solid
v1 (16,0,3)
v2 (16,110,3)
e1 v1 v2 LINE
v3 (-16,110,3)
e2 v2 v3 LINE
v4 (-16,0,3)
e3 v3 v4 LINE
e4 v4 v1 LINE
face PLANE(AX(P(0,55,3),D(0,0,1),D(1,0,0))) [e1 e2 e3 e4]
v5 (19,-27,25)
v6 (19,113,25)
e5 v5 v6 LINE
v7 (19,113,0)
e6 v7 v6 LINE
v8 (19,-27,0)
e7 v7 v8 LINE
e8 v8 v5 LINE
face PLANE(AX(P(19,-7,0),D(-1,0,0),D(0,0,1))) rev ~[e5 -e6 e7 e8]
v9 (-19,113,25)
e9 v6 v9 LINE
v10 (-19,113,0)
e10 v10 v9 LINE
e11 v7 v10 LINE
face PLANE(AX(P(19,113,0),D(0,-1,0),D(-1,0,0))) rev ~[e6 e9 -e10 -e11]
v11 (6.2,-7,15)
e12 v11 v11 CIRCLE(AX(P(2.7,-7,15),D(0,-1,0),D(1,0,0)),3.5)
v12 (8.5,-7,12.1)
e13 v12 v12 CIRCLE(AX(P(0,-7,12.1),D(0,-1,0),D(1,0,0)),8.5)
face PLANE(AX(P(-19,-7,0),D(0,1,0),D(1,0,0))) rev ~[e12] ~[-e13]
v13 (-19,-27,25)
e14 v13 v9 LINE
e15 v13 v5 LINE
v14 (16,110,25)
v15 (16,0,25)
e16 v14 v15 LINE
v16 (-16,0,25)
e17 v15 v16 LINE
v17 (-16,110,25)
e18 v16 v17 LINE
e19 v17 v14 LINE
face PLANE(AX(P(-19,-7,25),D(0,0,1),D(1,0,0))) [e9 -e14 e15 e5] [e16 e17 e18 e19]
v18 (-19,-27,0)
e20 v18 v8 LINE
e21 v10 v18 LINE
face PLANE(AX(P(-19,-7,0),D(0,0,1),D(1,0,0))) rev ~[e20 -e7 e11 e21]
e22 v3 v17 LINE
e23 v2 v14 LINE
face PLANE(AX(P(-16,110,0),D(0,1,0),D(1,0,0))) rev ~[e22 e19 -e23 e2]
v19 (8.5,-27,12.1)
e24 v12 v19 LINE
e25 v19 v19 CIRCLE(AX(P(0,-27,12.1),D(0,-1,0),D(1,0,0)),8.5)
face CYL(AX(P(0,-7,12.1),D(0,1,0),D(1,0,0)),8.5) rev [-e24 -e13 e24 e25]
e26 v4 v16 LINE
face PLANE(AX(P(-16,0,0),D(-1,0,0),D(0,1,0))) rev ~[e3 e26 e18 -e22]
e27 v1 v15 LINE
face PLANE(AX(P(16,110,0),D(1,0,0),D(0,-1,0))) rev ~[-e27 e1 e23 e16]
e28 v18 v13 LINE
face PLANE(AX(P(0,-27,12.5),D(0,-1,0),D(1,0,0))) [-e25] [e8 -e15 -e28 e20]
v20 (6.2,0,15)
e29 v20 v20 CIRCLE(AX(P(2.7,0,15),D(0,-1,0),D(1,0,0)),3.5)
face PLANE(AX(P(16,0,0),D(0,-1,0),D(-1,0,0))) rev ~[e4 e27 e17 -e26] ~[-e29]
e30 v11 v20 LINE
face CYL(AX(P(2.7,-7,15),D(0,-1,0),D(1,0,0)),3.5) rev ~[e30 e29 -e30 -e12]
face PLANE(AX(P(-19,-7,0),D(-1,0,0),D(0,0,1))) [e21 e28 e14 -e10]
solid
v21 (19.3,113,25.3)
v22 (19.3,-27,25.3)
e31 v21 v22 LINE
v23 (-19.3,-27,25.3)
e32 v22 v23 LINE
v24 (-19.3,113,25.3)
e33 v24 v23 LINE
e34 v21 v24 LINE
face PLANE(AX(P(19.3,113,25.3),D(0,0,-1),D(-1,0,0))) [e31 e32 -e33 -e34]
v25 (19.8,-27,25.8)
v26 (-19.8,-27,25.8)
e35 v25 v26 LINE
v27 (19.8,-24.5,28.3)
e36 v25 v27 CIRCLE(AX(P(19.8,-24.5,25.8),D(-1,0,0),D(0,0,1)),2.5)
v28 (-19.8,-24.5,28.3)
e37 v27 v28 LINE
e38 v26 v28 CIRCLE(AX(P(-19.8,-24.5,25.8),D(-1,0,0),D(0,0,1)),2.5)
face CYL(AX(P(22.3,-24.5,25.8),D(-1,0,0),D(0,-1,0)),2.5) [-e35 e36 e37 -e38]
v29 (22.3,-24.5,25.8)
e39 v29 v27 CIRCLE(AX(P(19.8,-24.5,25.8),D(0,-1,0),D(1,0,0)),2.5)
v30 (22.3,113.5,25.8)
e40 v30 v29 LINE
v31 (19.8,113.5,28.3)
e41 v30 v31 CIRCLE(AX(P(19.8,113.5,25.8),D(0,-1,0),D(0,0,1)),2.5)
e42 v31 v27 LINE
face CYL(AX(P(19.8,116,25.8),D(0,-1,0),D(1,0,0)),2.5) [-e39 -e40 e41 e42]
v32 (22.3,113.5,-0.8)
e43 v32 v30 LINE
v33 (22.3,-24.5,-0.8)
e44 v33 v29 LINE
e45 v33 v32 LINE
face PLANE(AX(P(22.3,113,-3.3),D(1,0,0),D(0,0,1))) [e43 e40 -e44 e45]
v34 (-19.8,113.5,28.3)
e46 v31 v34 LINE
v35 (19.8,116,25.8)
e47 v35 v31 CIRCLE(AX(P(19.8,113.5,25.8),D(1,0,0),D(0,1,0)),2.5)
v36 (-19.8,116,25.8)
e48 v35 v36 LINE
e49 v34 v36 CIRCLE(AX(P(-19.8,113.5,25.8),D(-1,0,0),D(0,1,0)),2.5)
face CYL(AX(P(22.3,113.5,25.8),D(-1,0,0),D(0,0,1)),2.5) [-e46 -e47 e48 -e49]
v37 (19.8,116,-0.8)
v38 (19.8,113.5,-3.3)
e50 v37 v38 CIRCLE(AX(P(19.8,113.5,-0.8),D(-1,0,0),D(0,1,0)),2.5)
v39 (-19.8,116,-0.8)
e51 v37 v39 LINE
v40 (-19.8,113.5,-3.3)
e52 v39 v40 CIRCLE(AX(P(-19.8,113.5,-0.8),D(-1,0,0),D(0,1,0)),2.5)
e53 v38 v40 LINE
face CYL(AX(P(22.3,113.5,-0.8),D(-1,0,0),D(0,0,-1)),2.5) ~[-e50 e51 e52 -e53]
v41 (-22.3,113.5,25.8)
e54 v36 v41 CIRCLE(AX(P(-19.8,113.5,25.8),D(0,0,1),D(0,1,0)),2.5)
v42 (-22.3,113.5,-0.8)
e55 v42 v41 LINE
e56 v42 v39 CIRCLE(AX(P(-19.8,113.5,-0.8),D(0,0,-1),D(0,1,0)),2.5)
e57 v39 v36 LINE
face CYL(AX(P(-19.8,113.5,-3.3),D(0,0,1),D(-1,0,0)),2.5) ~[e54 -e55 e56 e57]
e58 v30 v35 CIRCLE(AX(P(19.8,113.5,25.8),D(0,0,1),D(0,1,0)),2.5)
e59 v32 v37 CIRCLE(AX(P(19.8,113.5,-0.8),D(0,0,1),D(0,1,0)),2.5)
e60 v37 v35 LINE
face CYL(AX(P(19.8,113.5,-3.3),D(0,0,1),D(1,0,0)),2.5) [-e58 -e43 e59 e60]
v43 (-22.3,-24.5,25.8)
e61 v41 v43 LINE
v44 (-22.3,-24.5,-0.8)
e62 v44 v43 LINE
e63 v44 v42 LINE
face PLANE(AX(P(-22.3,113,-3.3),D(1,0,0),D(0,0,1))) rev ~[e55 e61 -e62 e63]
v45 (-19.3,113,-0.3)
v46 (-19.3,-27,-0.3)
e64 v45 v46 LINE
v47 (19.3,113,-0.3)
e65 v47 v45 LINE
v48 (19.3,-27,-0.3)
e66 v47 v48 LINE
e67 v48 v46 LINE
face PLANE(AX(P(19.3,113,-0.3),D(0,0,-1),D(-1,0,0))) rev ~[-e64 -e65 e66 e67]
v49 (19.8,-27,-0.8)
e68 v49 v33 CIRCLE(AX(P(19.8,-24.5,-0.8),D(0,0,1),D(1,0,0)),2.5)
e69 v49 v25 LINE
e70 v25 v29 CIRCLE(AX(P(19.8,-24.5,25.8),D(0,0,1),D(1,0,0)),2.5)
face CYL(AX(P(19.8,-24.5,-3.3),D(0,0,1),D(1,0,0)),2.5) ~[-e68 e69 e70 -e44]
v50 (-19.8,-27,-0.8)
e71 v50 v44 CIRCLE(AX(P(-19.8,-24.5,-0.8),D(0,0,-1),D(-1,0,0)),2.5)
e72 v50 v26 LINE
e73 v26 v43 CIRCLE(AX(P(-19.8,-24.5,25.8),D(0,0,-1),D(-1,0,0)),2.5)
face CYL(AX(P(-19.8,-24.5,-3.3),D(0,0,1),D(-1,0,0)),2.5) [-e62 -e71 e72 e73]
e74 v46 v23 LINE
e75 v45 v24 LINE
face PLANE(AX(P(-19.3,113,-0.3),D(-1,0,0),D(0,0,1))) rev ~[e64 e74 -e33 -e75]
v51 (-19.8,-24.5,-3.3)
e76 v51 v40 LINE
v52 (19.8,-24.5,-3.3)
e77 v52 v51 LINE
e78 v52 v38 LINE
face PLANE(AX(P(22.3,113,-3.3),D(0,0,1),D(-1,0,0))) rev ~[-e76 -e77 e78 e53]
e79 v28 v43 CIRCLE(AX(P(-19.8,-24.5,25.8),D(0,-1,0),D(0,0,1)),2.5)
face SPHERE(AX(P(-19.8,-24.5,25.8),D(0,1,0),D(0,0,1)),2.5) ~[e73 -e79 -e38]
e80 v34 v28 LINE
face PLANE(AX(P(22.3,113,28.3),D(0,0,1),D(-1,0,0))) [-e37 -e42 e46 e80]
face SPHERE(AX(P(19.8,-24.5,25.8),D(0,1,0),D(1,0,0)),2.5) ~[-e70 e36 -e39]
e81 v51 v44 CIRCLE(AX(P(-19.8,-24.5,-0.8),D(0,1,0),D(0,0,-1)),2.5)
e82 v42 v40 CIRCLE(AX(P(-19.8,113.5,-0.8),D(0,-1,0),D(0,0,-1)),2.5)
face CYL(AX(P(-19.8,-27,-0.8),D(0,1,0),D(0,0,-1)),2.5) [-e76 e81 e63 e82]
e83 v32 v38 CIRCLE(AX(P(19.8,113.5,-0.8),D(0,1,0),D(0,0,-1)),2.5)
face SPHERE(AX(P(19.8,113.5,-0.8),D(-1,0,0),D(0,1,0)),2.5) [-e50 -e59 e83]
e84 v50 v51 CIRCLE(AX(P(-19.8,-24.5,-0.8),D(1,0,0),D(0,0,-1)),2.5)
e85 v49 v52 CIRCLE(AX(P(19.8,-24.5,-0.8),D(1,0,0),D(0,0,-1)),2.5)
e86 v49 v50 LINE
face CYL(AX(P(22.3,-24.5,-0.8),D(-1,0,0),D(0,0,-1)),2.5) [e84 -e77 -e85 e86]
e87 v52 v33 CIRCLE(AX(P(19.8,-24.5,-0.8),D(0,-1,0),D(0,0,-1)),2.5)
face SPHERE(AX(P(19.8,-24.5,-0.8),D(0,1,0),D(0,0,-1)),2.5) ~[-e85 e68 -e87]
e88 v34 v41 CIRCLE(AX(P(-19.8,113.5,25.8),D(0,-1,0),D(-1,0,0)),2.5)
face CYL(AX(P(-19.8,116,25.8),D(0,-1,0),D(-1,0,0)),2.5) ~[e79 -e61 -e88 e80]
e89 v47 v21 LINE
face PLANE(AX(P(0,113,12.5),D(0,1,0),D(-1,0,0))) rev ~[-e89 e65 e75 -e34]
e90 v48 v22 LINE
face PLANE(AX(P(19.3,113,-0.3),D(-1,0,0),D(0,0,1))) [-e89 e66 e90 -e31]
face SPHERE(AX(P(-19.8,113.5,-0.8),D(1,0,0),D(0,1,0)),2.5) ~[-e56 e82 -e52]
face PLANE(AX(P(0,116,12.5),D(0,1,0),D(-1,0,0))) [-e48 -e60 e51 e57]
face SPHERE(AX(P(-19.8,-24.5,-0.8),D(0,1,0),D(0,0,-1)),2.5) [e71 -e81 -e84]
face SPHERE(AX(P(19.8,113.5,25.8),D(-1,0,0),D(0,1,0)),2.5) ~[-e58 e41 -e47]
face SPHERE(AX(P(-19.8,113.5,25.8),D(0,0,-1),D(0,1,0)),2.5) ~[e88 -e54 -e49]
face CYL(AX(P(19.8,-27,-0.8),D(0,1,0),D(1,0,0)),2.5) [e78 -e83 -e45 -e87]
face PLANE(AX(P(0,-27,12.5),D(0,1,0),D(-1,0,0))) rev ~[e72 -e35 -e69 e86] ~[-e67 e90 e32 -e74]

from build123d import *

# Parameters (mm, degrees)
F1_DEPTH = 3
F2_DEPTH = 25
F3_W     = 44.5999994099
F3_H     = 31.5999994099
F3_W_2   = 38.6
F3_H_2   = 25.6
F4_DEPTH = 140
F3_W_3   = 38
F3_H_3   = 25
F5_DEPTH = 3
F6_W     = 38
F6_H     = 25
F6_R     = 8.5
F7_DEPTH = 20
F6_R_2   = 3.5
F8_DEPTH = 7
F9_R     = 2.5


with BuildPart() as f1:
    # F0 (on Top) → F1 (new body)
    with BuildSketch(Plane.XY):
        Polygon((16, 110), (0, 110), (-16, 110), (-16, 50), (-16, 0), (0, 0), (16, 0), (16, 50), align=None)
    extrude(amount=F1_DEPTH)

    # F0 (on Top) → F2 (join)
    with BuildSketch(Plane.XY):
        Polygon((19, 113), (0, 113), (-19, 113), (-19, 47), (-19, -3), (-19, -7), (0, -7), (19, -7), (19, -3), (19, 47), align=None)
        Polygon((-16, 110), (0, 110), (16, 110), (16, 50), (16, 0), (0, 0), (-16, 0), (-16, 50), align=None, mode=Mode.SUBTRACT)
    extrude(amount=F2_DEPTH)

    # F6 (on face) → F7 (join)
    with BuildSketch(Plane.XZ.offset(7)):
        with Locations((0, 12.5)):
            Rectangle(F6_W, F6_H)
        with Locations((0, 12.1)):
            Circle(F6_R, mode=Mode.SUBTRACT)
    extrude(amount=F7_DEPTH)

    # F6 (on face) → F8 (cut, through all)
    with BuildSketch(Plane.XZ.offset(7)):
        with Locations((2.7, 15)):
            Circle(F6_R_2)
    extrude(amount=-F8_DEPTH, mode=Mode.SUBTRACT)


with BuildPart() as f4:
    # F3 (on face) → F4 (new body)
    with BuildSketch(Plane(origin=(0, 113, 0), x_dir=(-1, 0, 0), z_dir=(0, 1, 0))):
        with Locations((0, 12.5)):
            Rectangle(F3_W, F3_H)
        with Locations((0, 12.5)):
            Rectangle(F3_W_2, F3_H_2, mode=Mode.SUBTRACT)
    extrude(amount=-F4_DEPTH)

    # F3 (on face) → F5 (join)
    with BuildSketch(Plane(origin=(0, 113, 0), x_dir=(-1, 0, 0), z_dir=(0, 1, 0))):
        with Locations((0, 12.5)):
            Rectangle(F3_W, F3_H)
        with Locations((0, 12.5)):
            Rectangle(F3_W_2, F3_H_2, mode=Mode.SUBTRACT)
        with Locations((0, 12.5)):
            Rectangle(F3_W_2, F3_H_2)
        with Locations((0, 12.5)):
            Rectangle(F3_W_3, F3_H_3, mode=Mode.SUBTRACT)
        with Locations((0, 12.5)):
            Rectangle(F3_W_3, F3_H_3)
    extrude(amount=F5_DEPTH)

    # F9
    f9_edges = [f4.edges().sort_by_distance(p)[0] for p in [
        (0, 116, -3.3),
        (-22.3, 116, 12.5),
        (0, 116, 28.3),
        (22.3, 116, 12.5),
        (-22.3, 44.5, 28.3),
        (-22.3, 44.5, -3.3),
        (22.3, 44.5, -3.3),
        (22.3, 44.5, 28.3),
        (0, -27, -3.3),
        (22.3, -27, 12.5),
        (0, -27, 28.3),
        (-22.3, -27, 12.5),
    ]]
    fillet(f9_edges, radius=F9_R)


solid = Compound([f1.part, f4.part])
